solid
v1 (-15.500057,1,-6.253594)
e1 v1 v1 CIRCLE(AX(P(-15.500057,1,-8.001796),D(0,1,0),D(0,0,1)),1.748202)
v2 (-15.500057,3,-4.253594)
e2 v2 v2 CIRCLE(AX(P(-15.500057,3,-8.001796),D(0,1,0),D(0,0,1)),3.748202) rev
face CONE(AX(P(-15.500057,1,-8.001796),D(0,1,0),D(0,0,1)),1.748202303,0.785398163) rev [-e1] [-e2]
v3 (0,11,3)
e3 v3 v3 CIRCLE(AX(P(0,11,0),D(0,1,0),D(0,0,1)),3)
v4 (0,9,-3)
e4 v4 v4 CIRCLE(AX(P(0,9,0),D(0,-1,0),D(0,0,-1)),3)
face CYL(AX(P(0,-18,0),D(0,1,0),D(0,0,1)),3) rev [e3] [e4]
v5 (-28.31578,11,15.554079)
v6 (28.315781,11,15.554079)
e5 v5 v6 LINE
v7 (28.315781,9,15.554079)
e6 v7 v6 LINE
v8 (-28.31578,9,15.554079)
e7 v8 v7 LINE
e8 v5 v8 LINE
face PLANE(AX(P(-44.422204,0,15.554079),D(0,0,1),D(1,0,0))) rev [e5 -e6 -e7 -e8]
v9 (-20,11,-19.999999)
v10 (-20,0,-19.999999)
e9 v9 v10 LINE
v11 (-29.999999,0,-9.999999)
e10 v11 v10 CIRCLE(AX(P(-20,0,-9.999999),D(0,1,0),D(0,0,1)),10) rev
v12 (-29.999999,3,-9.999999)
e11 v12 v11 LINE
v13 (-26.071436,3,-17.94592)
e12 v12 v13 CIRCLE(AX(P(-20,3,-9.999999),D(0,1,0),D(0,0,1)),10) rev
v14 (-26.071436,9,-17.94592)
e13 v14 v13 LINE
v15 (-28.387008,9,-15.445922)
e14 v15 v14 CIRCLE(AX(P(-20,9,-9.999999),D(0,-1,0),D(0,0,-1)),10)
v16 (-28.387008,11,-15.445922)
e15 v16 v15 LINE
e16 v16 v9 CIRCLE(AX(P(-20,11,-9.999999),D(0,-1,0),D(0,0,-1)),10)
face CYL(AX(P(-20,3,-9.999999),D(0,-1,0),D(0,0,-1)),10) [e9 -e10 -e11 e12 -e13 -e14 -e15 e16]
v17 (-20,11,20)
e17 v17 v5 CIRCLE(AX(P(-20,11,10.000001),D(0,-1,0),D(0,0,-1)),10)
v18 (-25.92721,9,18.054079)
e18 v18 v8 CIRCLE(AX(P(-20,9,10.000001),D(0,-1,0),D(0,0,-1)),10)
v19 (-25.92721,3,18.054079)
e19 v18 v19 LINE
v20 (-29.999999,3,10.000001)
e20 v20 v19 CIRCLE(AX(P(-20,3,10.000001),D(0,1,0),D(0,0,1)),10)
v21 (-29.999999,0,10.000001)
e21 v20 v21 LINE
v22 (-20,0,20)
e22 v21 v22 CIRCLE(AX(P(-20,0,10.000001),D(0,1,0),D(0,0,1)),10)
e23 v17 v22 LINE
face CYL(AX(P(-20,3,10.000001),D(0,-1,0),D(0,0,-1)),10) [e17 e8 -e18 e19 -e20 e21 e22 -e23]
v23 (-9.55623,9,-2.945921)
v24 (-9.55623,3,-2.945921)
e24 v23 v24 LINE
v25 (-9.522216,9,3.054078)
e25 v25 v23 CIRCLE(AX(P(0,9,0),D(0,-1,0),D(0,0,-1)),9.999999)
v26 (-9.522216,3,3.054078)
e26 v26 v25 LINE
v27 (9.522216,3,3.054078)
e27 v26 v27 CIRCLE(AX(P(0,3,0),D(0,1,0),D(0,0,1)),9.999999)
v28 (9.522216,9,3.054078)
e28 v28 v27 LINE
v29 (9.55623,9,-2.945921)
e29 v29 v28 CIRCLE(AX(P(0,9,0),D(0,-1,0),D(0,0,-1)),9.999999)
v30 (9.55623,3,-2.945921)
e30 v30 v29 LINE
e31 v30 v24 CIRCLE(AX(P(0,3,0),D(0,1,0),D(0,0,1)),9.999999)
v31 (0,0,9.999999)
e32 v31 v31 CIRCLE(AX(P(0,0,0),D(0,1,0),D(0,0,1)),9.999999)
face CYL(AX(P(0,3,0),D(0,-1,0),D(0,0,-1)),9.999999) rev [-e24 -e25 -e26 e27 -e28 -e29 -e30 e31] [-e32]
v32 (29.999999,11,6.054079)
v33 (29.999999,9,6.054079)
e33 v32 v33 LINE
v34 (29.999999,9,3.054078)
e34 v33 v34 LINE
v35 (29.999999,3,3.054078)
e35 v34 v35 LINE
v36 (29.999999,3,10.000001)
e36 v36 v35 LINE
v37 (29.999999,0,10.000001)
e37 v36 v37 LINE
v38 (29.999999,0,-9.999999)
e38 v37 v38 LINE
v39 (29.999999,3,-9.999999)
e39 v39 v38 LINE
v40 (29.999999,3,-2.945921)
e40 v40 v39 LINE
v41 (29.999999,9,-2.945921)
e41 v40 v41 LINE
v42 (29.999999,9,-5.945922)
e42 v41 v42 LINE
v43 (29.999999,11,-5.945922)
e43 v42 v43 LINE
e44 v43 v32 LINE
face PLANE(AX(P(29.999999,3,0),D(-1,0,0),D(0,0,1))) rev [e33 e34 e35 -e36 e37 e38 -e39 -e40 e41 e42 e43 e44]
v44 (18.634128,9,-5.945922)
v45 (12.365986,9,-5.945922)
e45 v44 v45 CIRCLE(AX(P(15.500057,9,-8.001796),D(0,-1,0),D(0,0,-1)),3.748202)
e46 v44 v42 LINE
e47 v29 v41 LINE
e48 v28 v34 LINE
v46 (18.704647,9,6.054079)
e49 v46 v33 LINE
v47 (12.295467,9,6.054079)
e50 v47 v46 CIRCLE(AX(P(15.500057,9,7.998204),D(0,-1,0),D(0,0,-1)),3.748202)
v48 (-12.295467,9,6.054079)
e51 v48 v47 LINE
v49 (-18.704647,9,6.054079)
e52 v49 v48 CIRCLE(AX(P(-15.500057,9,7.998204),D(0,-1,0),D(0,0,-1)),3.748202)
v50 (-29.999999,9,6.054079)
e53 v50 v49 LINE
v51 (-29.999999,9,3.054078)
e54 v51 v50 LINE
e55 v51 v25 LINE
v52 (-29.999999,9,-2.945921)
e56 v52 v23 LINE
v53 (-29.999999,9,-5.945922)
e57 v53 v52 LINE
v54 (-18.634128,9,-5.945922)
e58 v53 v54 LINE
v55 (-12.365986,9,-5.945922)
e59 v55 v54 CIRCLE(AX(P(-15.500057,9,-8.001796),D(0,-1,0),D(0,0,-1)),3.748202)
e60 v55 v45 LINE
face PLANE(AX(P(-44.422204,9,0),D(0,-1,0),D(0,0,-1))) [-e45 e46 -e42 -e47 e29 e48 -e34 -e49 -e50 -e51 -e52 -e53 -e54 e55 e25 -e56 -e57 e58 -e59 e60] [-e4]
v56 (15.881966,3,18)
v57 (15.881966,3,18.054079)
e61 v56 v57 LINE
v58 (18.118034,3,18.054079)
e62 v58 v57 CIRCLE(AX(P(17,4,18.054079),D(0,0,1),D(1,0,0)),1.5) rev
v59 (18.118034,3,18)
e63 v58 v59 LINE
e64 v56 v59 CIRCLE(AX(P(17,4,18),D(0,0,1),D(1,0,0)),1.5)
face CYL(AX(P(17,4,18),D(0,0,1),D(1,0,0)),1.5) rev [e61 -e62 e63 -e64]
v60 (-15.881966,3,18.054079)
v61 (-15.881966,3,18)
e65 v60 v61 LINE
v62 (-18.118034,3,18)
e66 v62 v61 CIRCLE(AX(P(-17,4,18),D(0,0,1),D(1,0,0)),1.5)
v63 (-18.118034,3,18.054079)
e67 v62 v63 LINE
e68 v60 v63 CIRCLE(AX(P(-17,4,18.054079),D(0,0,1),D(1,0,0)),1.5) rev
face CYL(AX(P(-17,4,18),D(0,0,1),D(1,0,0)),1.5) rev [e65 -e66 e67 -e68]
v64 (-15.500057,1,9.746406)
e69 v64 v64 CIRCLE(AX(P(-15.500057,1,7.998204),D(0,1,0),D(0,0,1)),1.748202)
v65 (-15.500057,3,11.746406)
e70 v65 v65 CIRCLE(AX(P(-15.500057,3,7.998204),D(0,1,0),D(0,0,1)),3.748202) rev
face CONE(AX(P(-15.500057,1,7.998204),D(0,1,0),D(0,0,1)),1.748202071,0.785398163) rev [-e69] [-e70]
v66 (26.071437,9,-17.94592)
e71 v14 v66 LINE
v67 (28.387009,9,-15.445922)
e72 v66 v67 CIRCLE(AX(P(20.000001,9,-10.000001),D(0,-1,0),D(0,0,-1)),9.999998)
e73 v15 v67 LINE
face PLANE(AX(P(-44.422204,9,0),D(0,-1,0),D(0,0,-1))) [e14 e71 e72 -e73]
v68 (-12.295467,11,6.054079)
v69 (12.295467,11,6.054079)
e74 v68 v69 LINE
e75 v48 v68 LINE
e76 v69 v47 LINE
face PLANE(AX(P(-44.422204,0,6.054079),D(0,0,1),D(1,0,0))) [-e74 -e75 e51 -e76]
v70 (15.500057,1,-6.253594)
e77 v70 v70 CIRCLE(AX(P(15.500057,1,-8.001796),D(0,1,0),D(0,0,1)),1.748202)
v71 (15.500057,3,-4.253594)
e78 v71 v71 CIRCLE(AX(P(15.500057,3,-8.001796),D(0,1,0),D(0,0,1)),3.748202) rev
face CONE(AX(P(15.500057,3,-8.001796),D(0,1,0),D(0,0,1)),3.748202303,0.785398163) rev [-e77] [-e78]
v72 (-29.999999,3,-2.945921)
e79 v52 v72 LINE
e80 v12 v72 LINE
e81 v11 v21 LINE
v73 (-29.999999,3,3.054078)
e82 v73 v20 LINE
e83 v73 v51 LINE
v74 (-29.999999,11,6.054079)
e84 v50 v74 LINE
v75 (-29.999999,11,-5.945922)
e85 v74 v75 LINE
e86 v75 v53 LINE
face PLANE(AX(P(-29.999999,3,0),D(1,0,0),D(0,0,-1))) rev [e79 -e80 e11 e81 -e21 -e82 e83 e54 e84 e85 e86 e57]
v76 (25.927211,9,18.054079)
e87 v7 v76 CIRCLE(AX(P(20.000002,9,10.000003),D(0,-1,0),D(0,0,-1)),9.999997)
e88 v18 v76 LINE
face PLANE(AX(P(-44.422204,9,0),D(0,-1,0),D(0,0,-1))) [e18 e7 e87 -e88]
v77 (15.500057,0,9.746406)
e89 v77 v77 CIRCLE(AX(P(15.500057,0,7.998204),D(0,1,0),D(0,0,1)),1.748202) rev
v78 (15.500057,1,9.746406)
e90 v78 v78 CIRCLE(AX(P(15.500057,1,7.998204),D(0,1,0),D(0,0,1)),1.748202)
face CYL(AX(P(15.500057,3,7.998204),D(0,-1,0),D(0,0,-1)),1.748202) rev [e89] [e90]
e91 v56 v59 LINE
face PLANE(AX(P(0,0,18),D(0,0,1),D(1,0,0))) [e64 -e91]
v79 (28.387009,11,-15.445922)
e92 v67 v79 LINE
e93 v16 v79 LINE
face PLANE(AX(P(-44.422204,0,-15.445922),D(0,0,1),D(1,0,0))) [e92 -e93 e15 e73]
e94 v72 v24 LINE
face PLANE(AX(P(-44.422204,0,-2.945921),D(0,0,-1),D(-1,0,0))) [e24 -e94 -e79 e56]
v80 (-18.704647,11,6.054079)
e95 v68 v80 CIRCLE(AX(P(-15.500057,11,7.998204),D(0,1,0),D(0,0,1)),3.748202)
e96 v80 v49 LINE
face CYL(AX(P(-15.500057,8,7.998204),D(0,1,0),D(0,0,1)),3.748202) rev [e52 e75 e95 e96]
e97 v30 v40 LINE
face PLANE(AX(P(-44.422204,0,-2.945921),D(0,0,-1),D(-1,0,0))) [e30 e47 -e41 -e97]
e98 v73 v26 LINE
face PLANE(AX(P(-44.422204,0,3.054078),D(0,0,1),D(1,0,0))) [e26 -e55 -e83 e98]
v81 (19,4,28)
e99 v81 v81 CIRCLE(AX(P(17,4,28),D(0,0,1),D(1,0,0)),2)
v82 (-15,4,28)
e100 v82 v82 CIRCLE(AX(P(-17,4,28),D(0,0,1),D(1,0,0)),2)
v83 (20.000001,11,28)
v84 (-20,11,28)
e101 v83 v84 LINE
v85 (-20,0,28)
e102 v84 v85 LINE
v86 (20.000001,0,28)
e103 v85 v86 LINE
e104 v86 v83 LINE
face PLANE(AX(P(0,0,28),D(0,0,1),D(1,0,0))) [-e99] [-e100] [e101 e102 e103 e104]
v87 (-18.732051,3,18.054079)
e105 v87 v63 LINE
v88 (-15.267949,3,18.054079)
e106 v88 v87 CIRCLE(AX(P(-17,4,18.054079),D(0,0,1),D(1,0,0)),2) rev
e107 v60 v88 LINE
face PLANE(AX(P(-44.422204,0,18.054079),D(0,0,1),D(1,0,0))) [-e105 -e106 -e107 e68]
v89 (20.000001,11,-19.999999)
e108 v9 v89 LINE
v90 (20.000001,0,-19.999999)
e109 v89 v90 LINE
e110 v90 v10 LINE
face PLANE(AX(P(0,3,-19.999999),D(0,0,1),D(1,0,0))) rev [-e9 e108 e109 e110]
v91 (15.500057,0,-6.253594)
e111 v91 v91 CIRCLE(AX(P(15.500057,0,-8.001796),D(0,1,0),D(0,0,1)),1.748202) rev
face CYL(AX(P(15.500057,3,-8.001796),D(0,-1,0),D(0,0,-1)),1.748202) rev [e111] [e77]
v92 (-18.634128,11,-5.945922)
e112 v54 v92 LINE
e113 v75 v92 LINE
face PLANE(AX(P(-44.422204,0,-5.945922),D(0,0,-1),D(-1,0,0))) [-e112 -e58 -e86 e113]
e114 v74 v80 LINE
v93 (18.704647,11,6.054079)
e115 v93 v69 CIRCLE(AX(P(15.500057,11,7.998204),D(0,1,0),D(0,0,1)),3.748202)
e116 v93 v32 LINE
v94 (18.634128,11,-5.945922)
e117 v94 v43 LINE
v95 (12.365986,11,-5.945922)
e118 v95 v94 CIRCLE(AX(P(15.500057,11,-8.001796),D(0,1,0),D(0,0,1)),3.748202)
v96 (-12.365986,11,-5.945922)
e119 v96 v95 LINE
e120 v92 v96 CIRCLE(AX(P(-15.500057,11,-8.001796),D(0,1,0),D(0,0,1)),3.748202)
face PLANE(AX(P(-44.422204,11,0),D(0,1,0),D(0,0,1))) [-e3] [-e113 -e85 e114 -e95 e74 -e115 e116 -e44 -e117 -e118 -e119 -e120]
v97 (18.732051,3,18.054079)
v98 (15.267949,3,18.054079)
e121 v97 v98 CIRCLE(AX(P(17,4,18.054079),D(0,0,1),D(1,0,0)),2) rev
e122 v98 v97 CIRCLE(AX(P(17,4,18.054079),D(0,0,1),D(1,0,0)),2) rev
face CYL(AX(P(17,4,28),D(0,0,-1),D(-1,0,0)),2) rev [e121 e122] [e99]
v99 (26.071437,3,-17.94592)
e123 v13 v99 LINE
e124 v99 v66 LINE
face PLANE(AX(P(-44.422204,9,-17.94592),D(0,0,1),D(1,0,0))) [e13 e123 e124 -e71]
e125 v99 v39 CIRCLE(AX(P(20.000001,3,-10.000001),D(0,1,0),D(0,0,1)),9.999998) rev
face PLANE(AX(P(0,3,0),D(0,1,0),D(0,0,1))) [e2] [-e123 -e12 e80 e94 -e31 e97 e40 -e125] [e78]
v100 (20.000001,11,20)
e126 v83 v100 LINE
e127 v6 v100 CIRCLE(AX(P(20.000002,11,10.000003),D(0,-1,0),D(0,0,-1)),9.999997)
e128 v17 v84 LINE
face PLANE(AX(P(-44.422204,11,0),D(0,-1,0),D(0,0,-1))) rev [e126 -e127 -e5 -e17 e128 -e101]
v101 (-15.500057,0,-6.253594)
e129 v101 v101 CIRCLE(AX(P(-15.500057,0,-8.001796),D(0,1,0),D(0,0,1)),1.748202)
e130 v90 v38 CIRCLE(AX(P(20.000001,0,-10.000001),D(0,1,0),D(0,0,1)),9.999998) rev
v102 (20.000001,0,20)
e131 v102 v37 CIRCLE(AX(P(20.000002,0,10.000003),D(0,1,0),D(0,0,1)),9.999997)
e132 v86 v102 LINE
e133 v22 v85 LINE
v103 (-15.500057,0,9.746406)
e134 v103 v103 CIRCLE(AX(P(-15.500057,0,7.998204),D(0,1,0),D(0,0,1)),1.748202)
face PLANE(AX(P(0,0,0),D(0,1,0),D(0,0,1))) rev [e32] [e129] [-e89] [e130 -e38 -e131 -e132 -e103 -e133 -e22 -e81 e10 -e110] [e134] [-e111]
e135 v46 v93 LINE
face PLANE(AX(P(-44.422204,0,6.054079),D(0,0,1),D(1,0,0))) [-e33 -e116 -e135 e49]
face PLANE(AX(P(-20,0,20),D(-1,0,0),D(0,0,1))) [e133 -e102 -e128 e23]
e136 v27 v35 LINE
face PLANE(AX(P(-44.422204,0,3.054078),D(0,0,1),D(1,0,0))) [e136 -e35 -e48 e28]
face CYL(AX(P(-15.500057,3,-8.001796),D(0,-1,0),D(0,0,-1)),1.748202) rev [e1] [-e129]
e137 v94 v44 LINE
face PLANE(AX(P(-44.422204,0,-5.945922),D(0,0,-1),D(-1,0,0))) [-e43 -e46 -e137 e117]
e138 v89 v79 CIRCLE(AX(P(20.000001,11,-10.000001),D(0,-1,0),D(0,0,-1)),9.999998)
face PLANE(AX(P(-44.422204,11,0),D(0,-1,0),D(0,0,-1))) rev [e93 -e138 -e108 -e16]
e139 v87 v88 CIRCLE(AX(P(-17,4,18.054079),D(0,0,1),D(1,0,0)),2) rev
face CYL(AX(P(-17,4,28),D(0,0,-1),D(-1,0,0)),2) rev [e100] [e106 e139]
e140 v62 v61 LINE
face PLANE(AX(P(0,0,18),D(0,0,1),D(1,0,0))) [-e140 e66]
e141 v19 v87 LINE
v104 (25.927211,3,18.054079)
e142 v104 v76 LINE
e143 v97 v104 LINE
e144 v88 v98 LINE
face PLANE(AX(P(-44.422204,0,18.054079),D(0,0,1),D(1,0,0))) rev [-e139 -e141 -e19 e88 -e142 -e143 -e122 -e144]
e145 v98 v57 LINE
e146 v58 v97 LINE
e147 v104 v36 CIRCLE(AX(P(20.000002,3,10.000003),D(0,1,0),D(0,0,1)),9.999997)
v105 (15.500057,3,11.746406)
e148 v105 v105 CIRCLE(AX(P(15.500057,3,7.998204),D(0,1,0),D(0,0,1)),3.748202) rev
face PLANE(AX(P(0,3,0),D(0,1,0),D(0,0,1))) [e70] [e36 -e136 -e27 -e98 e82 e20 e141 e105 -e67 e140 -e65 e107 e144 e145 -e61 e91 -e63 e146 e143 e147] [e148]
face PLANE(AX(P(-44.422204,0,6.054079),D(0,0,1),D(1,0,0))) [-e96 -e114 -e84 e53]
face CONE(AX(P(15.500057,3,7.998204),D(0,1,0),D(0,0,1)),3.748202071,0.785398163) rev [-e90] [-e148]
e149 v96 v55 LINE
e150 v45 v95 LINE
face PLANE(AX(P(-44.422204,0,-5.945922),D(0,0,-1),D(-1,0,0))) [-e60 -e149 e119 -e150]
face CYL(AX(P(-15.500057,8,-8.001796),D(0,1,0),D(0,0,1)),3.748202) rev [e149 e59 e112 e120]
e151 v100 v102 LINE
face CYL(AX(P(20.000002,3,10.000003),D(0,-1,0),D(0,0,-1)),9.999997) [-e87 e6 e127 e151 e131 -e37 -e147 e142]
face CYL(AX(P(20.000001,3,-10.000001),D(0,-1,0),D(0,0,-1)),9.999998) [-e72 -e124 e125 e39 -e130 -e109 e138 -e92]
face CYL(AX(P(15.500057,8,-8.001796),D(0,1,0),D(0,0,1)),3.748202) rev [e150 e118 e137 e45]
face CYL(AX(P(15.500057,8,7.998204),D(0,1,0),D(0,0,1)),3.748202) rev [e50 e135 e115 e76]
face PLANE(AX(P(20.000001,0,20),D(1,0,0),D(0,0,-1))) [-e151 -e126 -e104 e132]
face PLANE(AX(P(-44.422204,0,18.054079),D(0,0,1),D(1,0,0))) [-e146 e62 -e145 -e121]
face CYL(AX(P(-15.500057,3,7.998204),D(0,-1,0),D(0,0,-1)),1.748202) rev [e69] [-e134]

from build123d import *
from build123d.topology import SkipClean

# Parameters (mm, degrees)
SKETCH1_R           = 9.999999259
SKETCH1_R_2         = 1.748202303
SKETCH1_R_3         = 1.748202071
BOSS_EXTRUDE1_DEPTH = 3
BOSS_EXTRUDE2_REACH = 65.317
BOSS_EXTRUDE3_DEPTH = 59.999998659
CUT_EXTRUDE1_START  = 18
SKETCH3_R           = 9.999999259
CUT_EXTRUDE1_DEPTH  = 18
SKETCH4_W           = 63.792856733
SKETCH4_H           = 41.767533566
CUT_EXTRUDE2_DEPTH  = 29
SKETCH5_R           = 2.99999956
CUT_EXTRUDE3_DEPTH  = 29
CHAMFER1_SIZE       = 2
CHAMFER2_SIZE       = 2
SKETCH6_R           = 3.748202071
SKETCH6_R_2         = 3.748202303
CUT_EXTRUDE4_DEPTH  = 3
SKETCH7_R           = 1.5
CUT_EXTRUDE5_DEPTH  = 2
SKETCH9_W           = 40.000000969
SKETCH9_H           = 2
BOSS_EXTRUDE4_DEPTH = 11
SKETCH10_W          = 40.000000969
SKETCH10_H          = 10.999999914
SKETCH10_R          = 2
BOSS_EXTRUDE5_DEPTH = 6
CUT_EXTRUDE6_START  = -3.945921595
SKETCH10_3_R        = 2
CUT_EXTRUDE6_DEPTH  = 3.945921595


with BuildPart() as part:
    # Sketch1 → Boss-Extrude1 (new body)
    with BuildSketch(Plane(origin=(0, 0, 0), x_dir=(1, 0, 0), z_dir=(0, 1, 0))):
        with BuildLine():
            Line((-19.999999553, -20.000000484), (20.000001416, -20.000000484))
            ThreePointArc((20.000001416, -20.000000484), (27.071068604, -17.071068441), (29.999999329, -10.000000708))
            Line((29.999999329, -10.000000708), (29.999999329, 9.999998845))
            ThreePointArc((29.999999329, 9.999998845), (27.071068411, 17.071066386), (20.000001416, 19.999998622))
            Line((20.000001416, 19.999998622), (-19.999999553, 19.999998622))
            ThreePointArc((-19.999999553, 19.999998622), (-27.071067207, 17.071066499), (-29.999999329, 9.999998845))
            Line((-29.999999329, 9.999998845), (-29.999999329, -10.000000708))
            ThreePointArc((-29.999999329, -10.000000708), (-27.071067207, -17.071068362), (-19.999999553, -20.000000484))
        make_face()
        with Locations(Location((0, 0, 0), (0, 0, 270))):
            Circle(SKETCH1_R, mode=Mode.SUBTRACT)
        with Locations(Location((15.500057023, 8.001796436, 0), (0, 0, 270))):
            Circle(SKETCH1_R_2, mode=Mode.SUBTRACT)
        with Locations(Location((-15.500057023, 8.001796436, 0), (0, 0, 270))):
            Circle(SKETCH1_R_2, mode=Mode.SUBTRACT)
        with Locations(Location((-15.500057023, -7.998204092, 0), (0, 0, 270))):
            Circle(SKETCH1_R_3, mode=Mode.SUBTRACT)
        with Locations(Location((15.500057023, -7.998204092, 0), (0, 0, 270))):
            Circle(SKETCH1_R_3, mode=Mode.SUBTRACT)
    extrude(amount=BOSS_EXTRUDE1_DEPTH)

    # Boss-Extrude2: up to this face of the body (flat: up to its plane)
    boss_extrude2_end = Plane(part.part.faces().sort_by_distance((-29.999999329, 1.5, 9.31e-07))[0])
    # Sketch2 → Boss-Extrude2 (add, up to the picked face)
    with BuildSketch(Plane(origin=(29.999999329, 0, 0), x_dir=(0, 0, -1), z_dir=(1, 0, 0)), mode=Mode.PRIVATE) as boss_extrude2_sk1:
        Polygon((-6.054078553, 8.999999586), (-3.054078061, 8.999999586), (-3.054078061, 3), (2.94592106, 3), (2.94592106, 8.999999586), (5.945921552, 8.999999586), (5.945921552, 10.999999914), (-6.054078553, 10.999999914), align=None)
    boss_extrude2_tool1 = split(extrude(boss_extrude2_sk1.sketch, amount=-BOSS_EXTRUDE2_REACH, mode=Mode.PRIVATE), bisect_by=boss_extrude2_end, keep=Keep.BOTH, mode=Mode.PRIVATE)
    # Sketch2 → Boss-Extrude2 (add, up to the picked face)
    with BuildSketch(Plane(origin=(29.999999329, 0, 0), x_dir=(0, 0, -1), z_dir=(1, 0, 0)), mode=Mode.PRIVATE) as boss_extrude2_sk2:
        Polygon((-15.554079178, 10.999999914), (-20.000000484, 10.999999914), (-20.000000484, 3), (-18.05407889, 3), (-18.05407889, 8.999999586), (-15.554079178, 8.999999586), align=None)
    boss_extrude2_tool2 = split(extrude(boss_extrude2_sk2.sketch, amount=-BOSS_EXTRUDE2_REACH, mode=Mode.PRIVATE), bisect_by=boss_extrude2_end, keep=Keep.BOTH, mode=Mode.PRIVATE)
    # Sketch2 → Boss-Extrude2 (add, up to the picked face)
    with BuildSketch(Plane(origin=(29.999999329, 0, 0), x_dir=(0, 0, -1), z_dir=(1, 0, 0)), mode=Mode.PRIVATE) as boss_extrude2_sk3:
        Polygon((19.737818007, 10.999999914), (15.445922178, 10.999999914), (15.445922178, 8.999999586), (17.945919793, 8.999999586), (17.945919793, 3), (19.872933217, 3), (19.872933217, 8.999999586), (19.737818007, 8.999999586), align=None)
    boss_extrude2_tool3 = split(extrude(boss_extrude2_sk3.sketch, amount=-BOSS_EXTRUDE2_REACH, mode=Mode.PRIVATE), bisect_by=boss_extrude2_end, keep=Keep.BOTH, mode=Mode.PRIVATE)
    add(boss_extrude2_tool1.solids().sort_by(Axis((29.999999, 7.6, 0.054079), (-1, 0, 0)))[0])
    add(boss_extrude2_tool2.solids().sort_by(Axis((29.999999, 7.72931, 18.48663), (-1, 0, 0)))[0])
    add(boss_extrude2_tool3.solids().sort_by(Axis((29.999999, 7.704328, -18.348039), (-1, 0, 0)))[0])

    # Sketch2<3> → Boss-Extrude3 (add)
    with BuildSketch(Plane(origin=(29.999999329, 0, 0), x_dir=(0, 0, -1), z_dir=(1, 0, 0))):
        Polygon((19.945920121, 10.999999914), (19.737818007, 10.999999914), (19.737818007, 8.999999586), (19.872933217, 8.999999586), (19.945920121, 8.999999586), align=None)
        Polygon((19.999998622, 10.999999914), (19.945920121, 10.999999914), (19.945920121, 8.999999586), (19.872933217, 8.999999586), (19.872933217, 3), (19.999998622, 3), align=None)
    extrude(amount=-BOSS_EXTRUDE3_DEPTH)

    # Sketch3 → Cut-Extrude1 (cut)
    with SkipClean():  # the faces are left unmerged after this step: merging them gives an invalid solid
        with BuildSketch(Plane.XZ.offset(-8.999999586).offset(CUT_EXTRUDE1_START)):
            with Locations(Location((0, 0, 0), (0, 0, 342.86691881))):
                Circle(SKETCH3_R)
        extrude(amount=-CUT_EXTRUDE1_DEPTH, mode=Mode.SUBTRACT)
    add(part.part.scale(1), mode=Mode.REPLACE)  # the faces are merged on a copy

    # Sketch4 → Cut-Extrude2 (cut)
    with BuildSketch(Plane.XZ):
        with Locations((1.275857135, -0.402901322)):
            Rectangle(SKETCH4_W, SKETCH4_H)
        with BuildLine():
            Line((20.000001416, 20.000000484), (-19.999999553, 20.000000484))
            ThreePointArc((-19.999999553, 20.000000484), (-27.071067207, 17.071068362), (-29.999999329, 10.000000708))
            Line((-29.999999329, 10.000000708), (-29.999999329, -9.999998845))
            ThreePointArc((-29.999999329, -9.999998845), (-27.071067207, -17.071066499), (-19.999999553, -19.999998622))
            Line((-19.999999553, -19.999998622), (20.000001416, -19.999998622))
            ThreePointArc((20.000001416, -19.999998622), (27.071068411, -17.071066386), (29.999999329, -9.999998845))
            Line((29.999999329, -9.999998845), (29.999999329, 10.000000708))
            ThreePointArc((29.999999329, 10.000000708), (27.071068604, 17.071068441), (20.000001416, 20.000000484))
        make_face(mode=Mode.SUBTRACT)
    extrude(amount=-CUT_EXTRUDE2_DEPTH, mode=Mode.SUBTRACT)

    # Sketch5 → Cut-Extrude3 (cut)
    with BuildSketch(Plane(origin=(0, 10.999999914, 0), x_dir=(1, 0, 0), z_dir=(0, 1, 0))):
        with Locations(Location((0, 0, 0), (0, 0, 270))):
            Circle(SKETCH5_R)
    extrude(amount=-CUT_EXTRUDE3_DEPTH, mode=Mode.SUBTRACT)

    # Chamfer1
    chamfer1_edges = [part.edges().sort_by_distance(p)[0] for p in [
        (-15.500057023, 3, 6.250002021),
    ]]
    chamfer(chamfer1_edges, length=CHAMFER1_SIZE)

    # Chamfer2
    chamfer2_edges = [part.edges().sort_by_distance(p)[0] for p in [
        (15.500057023, 3, -9.749998739),
        (-15.500057023, 3, -9.749998739),
        (15.500057023, 3, 6.250002021),
    ]]
    chamfer(chamfer2_edges, length=CHAMFER2_SIZE)

    # Sketch6 → Cut-Extrude4 (cut)
    with BuildSketch(Plane(origin=(0, 10.999999914, 0), x_dir=(1, 0, 0), z_dir=(0, 1, 0))):
        with Locations((-15.500057023, -7.998204092)):
            Circle(SKETCH6_R)
        with Locations((-15.500057023, 8.001796436)):
            Circle(SKETCH6_R_2)
        with Locations((15.500057023, -7.998204092)):
            Circle(SKETCH6_R)
        with Locations((15.500057023, 8.001796436)):
            Circle(SKETCH6_R_2)
    extrude(amount=-CUT_EXTRUDE4_DEPTH, mode=Mode.SUBTRACT)

    # Sketch7 → Cut-Extrude5 (cut)
    with BuildSketch(Plane.XY.offset(20.000000484)):
        with Locations((-17, 3.999999914)):
            Circle(SKETCH7_R)
        with Locations((17, 3.999999914)):
            Circle(SKETCH7_R)
    extrude(amount=-CUT_EXTRUDE5_DEPTH, mode=Mode.SUBTRACT)

    # Sketch9 → Boss-Extrude4 (add)
    with BuildSketch(Plane(origin=(0, 10.999999914, 0), x_dir=(1, 0, 0), z_dir=(0, 1, 0))):
        with Locations((9.31e-07, -21.000000484)):
            Rectangle(SKETCH9_W, SKETCH9_H)
    extrude(amount=-BOSS_EXTRUDE4_DEPTH)

    # Sketch10 → Boss-Extrude5 (add)
    with BuildSketch(Plane.XY.offset(22.000000484)):
        with Locations((9.31e-07, 5.499999957)):
            Rectangle(SKETCH10_W, SKETCH10_H)
        with Locations((-17, 3.999999914)):
            Circle(SKETCH10_R, mode=Mode.SUBTRACT)
        with Locations((17, 3.999999914)):
            Circle(SKETCH10_R, mode=Mode.SUBTRACT)
    extrude(amount=BOSS_EXTRUDE5_DEPTH)

    # Sketch10<3> → Cut-Extrude6 (cut)
    with BuildSketch(Plane.XY.offset(22.000000484).offset(CUT_EXTRUDE6_START)):
        with Locations(Location((17, 3.999999914, 0), (0, 0, 209.999997166))):
            Circle(SKETCH10_3_R)
        with Locations(Location((-17, 3.999999914, 0), (0, 0, 209.999997166))):
            Circle(SKETCH10_3_R)
    extrude(amount=CUT_EXTRUDE6_DEPTH, mode=Mode.SUBTRACT)


solid = part.part
